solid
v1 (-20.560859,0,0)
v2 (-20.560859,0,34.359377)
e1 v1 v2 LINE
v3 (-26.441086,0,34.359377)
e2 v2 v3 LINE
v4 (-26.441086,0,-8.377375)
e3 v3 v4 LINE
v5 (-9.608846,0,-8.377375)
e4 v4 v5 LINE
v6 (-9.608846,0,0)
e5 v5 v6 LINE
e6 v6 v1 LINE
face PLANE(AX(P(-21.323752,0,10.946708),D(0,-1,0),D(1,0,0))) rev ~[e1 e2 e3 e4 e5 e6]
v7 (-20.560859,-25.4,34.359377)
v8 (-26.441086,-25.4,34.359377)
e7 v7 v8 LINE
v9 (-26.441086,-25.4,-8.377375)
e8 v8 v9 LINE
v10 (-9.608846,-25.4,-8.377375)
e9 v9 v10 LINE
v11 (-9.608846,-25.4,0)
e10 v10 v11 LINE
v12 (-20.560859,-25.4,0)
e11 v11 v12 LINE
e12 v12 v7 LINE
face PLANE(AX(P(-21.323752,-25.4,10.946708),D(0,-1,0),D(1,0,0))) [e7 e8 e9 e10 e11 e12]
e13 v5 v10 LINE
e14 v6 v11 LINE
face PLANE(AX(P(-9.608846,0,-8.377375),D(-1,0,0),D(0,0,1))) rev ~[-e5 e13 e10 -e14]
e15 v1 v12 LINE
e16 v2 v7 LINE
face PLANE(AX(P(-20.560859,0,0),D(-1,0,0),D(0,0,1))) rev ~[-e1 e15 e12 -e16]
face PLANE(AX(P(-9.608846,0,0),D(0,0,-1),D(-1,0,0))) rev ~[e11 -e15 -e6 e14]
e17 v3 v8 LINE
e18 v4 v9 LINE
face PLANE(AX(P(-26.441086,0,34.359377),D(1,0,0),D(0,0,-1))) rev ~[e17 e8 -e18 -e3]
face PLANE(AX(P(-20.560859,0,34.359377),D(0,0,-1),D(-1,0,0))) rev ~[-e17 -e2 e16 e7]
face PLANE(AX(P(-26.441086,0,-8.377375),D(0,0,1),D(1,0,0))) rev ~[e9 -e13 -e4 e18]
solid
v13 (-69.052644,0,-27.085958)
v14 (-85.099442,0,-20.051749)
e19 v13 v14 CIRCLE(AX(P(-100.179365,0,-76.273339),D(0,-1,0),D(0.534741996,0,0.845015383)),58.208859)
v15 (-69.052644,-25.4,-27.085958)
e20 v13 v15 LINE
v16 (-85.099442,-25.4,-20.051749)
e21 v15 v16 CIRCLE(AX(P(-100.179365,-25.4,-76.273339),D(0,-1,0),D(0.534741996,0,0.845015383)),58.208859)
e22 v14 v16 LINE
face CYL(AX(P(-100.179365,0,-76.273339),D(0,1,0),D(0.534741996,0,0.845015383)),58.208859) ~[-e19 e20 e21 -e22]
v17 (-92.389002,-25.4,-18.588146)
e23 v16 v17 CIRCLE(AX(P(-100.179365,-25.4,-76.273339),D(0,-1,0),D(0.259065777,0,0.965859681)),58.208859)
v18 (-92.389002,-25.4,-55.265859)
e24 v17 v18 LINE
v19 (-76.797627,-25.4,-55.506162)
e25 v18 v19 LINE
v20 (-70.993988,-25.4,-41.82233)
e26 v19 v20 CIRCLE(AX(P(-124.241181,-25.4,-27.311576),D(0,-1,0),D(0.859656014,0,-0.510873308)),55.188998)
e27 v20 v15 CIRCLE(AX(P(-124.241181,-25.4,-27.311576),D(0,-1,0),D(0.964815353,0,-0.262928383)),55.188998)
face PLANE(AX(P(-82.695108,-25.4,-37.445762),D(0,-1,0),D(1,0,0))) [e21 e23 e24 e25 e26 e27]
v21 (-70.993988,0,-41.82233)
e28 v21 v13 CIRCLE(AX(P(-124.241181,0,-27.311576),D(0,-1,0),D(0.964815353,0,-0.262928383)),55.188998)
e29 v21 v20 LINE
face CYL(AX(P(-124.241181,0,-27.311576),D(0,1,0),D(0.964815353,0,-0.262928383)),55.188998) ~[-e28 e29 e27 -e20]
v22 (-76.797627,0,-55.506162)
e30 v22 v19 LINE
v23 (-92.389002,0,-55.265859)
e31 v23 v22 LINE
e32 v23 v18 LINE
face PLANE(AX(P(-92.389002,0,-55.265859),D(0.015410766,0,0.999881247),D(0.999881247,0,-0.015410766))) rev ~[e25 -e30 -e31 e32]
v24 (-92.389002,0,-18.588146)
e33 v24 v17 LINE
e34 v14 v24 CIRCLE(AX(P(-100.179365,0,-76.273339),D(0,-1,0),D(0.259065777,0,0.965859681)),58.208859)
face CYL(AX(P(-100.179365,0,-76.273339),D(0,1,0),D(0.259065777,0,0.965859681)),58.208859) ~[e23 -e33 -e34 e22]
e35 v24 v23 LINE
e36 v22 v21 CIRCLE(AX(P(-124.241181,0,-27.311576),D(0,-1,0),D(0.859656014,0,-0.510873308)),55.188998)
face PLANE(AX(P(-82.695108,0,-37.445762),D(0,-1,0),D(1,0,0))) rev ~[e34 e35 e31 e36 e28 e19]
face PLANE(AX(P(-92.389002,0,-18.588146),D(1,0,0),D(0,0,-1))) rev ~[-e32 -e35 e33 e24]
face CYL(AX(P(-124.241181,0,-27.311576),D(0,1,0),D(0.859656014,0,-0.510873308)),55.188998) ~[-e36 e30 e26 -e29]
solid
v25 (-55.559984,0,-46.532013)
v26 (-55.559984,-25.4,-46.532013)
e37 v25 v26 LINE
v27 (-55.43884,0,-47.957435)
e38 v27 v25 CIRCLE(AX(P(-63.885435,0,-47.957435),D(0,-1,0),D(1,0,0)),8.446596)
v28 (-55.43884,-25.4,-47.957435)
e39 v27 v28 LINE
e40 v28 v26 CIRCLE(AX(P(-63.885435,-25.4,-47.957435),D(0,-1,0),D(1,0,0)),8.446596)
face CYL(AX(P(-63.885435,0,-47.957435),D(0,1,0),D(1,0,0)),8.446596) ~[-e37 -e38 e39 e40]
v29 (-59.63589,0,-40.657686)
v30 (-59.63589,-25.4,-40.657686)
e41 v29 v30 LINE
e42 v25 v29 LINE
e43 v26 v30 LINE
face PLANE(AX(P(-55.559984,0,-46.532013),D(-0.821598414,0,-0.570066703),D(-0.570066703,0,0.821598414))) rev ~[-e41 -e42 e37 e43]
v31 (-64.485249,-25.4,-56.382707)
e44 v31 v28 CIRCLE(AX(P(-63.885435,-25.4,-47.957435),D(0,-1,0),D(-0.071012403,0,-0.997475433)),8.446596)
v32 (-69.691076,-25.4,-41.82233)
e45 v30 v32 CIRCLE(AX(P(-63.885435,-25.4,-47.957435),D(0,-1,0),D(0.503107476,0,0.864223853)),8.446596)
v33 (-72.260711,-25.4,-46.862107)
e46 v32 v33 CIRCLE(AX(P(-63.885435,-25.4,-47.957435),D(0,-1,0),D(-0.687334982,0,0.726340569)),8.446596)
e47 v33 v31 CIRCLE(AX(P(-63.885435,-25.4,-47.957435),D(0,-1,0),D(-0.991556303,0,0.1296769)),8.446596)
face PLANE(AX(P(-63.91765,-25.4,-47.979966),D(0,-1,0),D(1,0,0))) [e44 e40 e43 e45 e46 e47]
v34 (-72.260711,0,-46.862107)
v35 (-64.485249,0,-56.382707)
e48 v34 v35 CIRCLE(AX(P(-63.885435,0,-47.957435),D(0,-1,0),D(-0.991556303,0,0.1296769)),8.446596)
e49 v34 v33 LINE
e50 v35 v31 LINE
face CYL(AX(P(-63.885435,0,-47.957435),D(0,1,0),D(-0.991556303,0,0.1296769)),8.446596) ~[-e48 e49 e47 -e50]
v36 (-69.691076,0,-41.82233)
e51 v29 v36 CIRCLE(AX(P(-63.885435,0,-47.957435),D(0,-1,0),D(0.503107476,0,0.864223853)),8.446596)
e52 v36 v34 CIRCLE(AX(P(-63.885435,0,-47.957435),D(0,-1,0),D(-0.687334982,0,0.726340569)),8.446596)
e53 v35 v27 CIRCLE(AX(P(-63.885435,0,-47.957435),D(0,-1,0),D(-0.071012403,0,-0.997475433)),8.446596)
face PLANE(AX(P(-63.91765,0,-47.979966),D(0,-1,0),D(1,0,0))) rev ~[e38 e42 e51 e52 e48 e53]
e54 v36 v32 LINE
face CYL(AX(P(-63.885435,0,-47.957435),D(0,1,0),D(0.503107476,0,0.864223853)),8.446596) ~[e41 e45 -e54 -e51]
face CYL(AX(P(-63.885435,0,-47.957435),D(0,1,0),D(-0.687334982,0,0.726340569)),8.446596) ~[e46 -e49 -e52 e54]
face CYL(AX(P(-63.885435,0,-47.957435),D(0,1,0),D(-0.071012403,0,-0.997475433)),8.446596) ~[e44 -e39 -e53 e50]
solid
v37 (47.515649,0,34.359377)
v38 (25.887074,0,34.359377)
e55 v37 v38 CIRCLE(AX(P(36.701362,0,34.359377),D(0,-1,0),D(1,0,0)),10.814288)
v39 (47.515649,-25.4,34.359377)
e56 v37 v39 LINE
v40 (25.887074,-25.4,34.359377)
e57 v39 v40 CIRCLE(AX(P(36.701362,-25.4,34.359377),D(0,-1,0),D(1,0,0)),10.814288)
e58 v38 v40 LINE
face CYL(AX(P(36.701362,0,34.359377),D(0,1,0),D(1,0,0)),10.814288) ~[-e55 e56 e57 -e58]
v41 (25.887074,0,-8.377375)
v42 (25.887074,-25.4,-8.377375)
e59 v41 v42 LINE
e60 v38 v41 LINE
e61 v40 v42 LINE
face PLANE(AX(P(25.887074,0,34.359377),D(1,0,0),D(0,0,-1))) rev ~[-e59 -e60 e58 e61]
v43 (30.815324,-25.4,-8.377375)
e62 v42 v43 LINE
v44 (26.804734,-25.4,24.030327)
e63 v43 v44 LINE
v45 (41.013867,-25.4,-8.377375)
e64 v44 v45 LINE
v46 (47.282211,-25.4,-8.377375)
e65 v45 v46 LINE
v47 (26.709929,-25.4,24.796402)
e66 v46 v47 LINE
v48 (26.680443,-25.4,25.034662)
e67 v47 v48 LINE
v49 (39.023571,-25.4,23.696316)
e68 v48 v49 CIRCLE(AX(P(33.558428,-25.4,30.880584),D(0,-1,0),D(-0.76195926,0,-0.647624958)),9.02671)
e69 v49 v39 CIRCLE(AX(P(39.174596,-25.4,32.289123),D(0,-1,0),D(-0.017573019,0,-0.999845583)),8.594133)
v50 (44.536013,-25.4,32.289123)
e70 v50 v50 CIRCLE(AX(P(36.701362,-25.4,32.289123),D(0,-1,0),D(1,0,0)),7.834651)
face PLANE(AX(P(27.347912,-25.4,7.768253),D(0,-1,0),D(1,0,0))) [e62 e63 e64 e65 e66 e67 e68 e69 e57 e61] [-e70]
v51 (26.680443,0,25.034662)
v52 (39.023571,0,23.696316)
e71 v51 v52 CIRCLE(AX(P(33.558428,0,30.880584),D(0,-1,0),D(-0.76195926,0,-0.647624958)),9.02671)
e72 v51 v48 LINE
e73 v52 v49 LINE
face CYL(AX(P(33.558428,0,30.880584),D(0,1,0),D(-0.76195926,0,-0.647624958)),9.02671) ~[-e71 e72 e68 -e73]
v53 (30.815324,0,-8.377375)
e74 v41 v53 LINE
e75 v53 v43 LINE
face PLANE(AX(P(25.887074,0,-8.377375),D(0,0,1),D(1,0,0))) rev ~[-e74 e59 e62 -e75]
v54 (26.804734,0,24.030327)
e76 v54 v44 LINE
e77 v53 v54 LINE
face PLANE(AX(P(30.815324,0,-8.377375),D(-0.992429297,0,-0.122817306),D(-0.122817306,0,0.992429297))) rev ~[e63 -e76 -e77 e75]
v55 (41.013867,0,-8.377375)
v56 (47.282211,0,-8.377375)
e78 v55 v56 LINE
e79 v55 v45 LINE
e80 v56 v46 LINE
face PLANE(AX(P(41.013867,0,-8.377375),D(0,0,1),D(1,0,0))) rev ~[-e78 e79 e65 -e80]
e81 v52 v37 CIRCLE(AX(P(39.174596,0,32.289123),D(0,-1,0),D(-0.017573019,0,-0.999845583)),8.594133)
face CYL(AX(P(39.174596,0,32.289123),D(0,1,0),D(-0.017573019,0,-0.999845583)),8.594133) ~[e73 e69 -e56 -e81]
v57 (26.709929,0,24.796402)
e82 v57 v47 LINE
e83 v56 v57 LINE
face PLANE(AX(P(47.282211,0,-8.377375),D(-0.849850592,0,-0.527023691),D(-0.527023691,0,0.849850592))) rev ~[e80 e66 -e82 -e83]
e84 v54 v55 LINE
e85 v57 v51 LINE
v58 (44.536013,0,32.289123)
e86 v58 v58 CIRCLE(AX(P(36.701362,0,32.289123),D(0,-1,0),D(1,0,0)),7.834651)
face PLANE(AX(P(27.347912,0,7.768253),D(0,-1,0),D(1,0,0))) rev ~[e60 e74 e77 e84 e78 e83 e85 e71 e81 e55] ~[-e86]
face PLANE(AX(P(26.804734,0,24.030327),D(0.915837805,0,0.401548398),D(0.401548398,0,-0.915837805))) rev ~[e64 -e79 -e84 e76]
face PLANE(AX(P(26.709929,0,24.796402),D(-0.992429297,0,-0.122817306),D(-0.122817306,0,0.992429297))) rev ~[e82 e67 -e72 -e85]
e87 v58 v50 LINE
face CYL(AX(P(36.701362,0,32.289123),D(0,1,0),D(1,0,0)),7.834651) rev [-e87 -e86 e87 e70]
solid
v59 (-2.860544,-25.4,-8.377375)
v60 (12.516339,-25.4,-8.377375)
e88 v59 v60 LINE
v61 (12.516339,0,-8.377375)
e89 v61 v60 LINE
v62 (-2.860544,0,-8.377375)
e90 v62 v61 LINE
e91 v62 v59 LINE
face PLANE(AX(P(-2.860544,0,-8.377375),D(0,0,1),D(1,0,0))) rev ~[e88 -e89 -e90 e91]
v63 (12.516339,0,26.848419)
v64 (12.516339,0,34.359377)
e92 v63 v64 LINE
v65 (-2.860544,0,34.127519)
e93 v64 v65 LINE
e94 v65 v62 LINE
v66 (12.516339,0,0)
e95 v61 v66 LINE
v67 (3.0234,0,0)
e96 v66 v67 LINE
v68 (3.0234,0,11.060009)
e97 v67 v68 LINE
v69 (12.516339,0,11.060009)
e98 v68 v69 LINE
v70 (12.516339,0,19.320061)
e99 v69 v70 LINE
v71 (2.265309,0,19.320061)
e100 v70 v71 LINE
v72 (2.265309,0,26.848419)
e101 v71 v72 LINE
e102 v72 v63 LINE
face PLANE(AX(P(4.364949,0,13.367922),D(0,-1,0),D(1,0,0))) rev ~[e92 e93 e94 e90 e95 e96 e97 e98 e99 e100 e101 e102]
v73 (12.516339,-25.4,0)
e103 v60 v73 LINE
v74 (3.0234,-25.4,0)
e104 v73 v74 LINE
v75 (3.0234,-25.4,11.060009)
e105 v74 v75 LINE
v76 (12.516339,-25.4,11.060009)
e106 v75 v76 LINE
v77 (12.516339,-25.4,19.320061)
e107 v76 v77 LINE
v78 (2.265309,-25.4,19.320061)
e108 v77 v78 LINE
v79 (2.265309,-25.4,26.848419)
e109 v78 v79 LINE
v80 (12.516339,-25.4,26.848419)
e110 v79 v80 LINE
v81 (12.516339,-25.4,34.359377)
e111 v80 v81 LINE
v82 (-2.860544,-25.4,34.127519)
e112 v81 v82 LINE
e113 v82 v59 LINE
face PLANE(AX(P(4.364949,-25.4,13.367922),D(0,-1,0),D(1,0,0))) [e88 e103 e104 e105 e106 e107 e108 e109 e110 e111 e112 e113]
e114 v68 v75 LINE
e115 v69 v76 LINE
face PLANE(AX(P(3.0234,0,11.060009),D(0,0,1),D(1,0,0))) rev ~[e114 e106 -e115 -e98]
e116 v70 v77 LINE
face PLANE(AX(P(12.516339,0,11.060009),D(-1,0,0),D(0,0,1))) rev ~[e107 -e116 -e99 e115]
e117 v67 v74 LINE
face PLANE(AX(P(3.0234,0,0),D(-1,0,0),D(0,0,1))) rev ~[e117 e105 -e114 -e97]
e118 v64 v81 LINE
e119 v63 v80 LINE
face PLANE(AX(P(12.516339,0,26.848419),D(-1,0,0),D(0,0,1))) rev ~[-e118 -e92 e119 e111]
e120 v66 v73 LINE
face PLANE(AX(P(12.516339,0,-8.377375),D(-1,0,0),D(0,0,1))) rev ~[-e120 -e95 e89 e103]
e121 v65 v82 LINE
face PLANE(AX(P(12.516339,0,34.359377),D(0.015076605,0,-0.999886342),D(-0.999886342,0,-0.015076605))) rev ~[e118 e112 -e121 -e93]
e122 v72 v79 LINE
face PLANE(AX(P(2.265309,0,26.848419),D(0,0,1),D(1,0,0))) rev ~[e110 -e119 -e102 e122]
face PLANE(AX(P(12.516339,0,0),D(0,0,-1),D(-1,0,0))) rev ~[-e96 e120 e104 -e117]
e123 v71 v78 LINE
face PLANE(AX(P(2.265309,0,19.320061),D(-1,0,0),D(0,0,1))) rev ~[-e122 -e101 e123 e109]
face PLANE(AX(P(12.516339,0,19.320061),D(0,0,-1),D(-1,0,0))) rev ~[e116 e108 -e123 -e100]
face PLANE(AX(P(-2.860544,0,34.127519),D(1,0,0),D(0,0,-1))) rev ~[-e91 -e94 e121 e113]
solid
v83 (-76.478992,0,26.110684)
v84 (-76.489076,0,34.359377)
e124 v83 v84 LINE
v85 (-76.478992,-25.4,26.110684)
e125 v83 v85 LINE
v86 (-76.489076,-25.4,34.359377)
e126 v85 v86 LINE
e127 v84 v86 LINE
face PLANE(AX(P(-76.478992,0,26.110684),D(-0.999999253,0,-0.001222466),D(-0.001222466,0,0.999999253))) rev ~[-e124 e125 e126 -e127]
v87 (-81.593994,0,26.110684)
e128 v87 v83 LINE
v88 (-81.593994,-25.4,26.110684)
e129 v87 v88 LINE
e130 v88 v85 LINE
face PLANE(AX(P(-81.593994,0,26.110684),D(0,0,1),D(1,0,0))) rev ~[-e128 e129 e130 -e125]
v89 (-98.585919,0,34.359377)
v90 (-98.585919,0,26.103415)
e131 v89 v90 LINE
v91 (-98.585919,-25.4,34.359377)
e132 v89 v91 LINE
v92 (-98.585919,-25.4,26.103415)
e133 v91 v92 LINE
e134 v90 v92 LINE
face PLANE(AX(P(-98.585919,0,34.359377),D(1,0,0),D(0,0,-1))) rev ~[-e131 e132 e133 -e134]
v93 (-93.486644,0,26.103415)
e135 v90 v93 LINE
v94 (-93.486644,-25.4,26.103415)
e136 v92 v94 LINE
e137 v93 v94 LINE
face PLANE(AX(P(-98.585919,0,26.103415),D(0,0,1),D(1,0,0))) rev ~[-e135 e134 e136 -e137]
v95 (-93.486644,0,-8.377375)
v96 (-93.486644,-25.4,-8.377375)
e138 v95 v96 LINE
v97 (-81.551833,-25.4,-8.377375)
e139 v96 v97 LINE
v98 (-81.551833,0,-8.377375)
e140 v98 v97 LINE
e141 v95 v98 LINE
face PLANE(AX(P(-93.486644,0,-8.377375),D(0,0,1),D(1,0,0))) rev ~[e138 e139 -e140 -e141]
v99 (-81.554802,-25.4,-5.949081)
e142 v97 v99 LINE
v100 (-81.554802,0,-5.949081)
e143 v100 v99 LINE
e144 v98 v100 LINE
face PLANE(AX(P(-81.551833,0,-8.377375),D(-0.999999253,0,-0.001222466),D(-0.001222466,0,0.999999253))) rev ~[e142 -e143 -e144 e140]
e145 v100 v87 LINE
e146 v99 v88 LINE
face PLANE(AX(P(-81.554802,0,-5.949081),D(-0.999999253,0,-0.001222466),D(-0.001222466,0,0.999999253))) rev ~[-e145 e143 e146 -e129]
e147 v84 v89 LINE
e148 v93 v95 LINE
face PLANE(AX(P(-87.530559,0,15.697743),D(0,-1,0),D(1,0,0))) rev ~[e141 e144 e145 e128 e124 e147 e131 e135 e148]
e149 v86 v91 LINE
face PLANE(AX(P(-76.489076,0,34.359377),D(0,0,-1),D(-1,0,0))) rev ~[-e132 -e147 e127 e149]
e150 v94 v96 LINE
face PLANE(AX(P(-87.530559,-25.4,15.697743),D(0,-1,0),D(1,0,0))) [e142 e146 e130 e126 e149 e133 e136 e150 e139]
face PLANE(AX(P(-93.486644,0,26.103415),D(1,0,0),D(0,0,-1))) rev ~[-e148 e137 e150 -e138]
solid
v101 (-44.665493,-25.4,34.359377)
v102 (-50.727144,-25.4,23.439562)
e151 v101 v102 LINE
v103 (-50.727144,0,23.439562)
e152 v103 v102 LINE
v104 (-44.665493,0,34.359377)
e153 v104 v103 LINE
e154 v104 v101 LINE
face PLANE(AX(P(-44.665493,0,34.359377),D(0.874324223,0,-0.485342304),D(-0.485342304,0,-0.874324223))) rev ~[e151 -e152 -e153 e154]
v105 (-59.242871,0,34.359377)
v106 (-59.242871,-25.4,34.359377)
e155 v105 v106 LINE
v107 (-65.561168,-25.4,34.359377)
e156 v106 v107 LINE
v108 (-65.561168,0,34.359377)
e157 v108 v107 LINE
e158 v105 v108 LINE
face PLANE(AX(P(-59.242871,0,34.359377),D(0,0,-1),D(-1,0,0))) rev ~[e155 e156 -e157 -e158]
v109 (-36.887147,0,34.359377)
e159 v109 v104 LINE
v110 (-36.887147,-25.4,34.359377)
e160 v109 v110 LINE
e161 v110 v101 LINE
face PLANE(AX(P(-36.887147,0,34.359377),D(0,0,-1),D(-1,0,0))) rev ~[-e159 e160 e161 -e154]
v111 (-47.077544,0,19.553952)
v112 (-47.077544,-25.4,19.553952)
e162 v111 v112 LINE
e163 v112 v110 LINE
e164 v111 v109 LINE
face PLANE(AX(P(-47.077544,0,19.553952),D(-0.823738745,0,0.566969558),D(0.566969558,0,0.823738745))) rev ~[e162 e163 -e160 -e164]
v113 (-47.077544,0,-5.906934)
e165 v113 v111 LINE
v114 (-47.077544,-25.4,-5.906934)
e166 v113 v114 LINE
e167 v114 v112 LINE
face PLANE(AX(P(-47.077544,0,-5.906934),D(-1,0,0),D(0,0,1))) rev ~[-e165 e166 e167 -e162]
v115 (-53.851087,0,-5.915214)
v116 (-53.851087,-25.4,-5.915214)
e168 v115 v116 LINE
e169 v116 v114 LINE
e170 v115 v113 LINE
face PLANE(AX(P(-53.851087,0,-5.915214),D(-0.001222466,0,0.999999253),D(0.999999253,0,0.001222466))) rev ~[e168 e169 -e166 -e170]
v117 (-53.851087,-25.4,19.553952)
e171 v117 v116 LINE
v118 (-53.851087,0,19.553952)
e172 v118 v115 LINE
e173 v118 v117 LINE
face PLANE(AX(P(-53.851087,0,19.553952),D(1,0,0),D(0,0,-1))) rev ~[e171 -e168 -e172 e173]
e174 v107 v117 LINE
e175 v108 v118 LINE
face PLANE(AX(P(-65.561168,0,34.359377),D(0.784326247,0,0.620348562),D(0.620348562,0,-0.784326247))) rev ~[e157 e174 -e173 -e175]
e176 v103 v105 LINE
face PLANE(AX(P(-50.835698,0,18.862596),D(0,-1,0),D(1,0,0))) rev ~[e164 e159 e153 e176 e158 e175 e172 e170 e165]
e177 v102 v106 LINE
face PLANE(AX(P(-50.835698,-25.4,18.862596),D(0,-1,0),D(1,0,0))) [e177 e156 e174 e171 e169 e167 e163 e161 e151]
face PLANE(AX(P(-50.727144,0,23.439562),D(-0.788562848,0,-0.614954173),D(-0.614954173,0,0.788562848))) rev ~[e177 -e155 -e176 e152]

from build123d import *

# Parameters (mm, degrees)
F1_DEPTH = 25.4
F0_R     = 7.8346511006
F2_DEPTH = 25.4


# Not quite as in the source:
# - a feature names something its author has since deleted; it is built from what else it names


with BuildPart() as f1:
    # F0 (on Front) → F1 (new body)
    with BuildSketch(Plane.XZ):
        Polygon((-81.5548015942, -5.9490810307), (-81.5939936003, 26.1106837792), (-76.4789922628, 26.1106837792), (-76.4890760183, 34.3593768775), (-98.5859185457, 34.3593768775), (-98.5859185457, 26.1034145951), (-93.4866443276, 26.1034145951), (-93.4866443276, -8.3773750812), (-85.1137137568, -8.3773750812), (-81.5518330847, -8.3773750812), align=None)
    extrude(amount=F1_DEPTH)


with BuildPart() as f1b:
    # F0 (on Front) → F1, piece 2 (new body)
    with BuildSketch(Plane.XZ):
        Polygon((-53.8510866463, 19.5539519191), (-53.8510866463, -5.915214152), (-47.0775440335, -5.9069337194), (-47.0775440335, 19.5539519191), (-36.8871465325, 34.3593768775), (-44.6654930711, 34.3593768775), (-50.7271438837, 23.4395619482), (-59.2428706586, 34.3593768775), (-65.5611678958, 34.3593768775), align=None)
    extrude(amount=F1_DEPTH)


with BuildPart() as f1c:
    # F0 (on Front) → F1, piece 3 (new body)
    with BuildSketch(Plane.XZ):
        Polygon((-26.4410860837, 34.3593768775), (-26.4410860837, -5.8817063295), (-9.6088461578, -5.8611294708), (-9.6088461578, 0), (-20.5608587712, 0), (-20.5608587712, 34.3593768775), align=None)
        Polygon((-9.6088461578, -5.8611294708), (-26.4410860837, -5.8817063295), (-26.4410860837, -8.3773750812), (-9.6088461578, -8.3773750812), align=None)
    extrude(amount=F1_DEPTH)


with BuildPart() as f1d:
    # F0 (on Front) → F1, piece 4 (new body)
    with BuildSketch(Plane.XZ):
        Polygon((-2.8605444822, 34.1275193292), (-2.8605444822, -5.8528798943), (-2.8605444822, -8.3773750812), (12.5163393095, -8.3773750812), (12.5163393095, 0), (3.0234002043, 0), (3.0234002043, 11.0600087792), (12.5163393095, 11.0600087792), (12.5163393095, 19.3200614303), (2.2653094493, 19.3200614303), (2.2653094493, 26.8484186381), (12.5163393095, 26.8484186381), (12.5163393095, 34.3593768775), align=None)
    extrude(amount=F1_DEPTH)


with BuildPart() as f1e:
    # F0 (on Front) → F1, piece 5 (new body)
    with BuildSketch(Plane.XZ):
        Polygon((25.887073949, -5.817736878), (25.887073949, -8.3773750812), (30.8153238147, -8.3773750812), (26.804734222, 24.0303265492), (25.887073949, 26.1232946068), align=None)
        Polygon((41.013866663, -8.3773750812), (47.2822114825, -8.3773750812), (26.7099292009, 24.7964016527), (26.804734222, 24.0303265492), align=None)
        with BuildLine():
            Line((25.887073949, 31.4455106854), (25.887073949, 26.1232946068))
            ThreePointArc((25.887073949, 26.1232946068), (26.2634233094, 25.5641583421), (26.6804434798, 25.0346619955))
            Line((26.6804434798, 25.0346619955), (25.887073949, 31.4455106854))
        make_face()
        with BuildLine():
            Line((25.887073949, 31.4455106854), (26.6804434798, 25.0346619955))
            ThreePointArc((26.6804434798, 25.0346619955), (32.5853799721, 21.9064737064), (39.0235707164, 23.6963164061))
            ThreePointArc((39.0235707164, 23.6963164061), (45.8972704971, 26.9351735913), (47.5156493485, 34.3593768775))
            ThreePointArc((47.5156493485, 34.3593768775), (36.7013616487, 45.1736645773), (25.887073949, 34.3593768775))
            Line((25.887073949, 34.3593768775), (25.887073949, 31.4455106854))
        make_face()
        with Locations((36.7013616487, 32.2891227819)):
            Circle(F0_R, mode=Mode.SUBTRACT)
        with BuildLine():
            Line((25.887073949, 26.1232946068), (26.7099292009, 24.7964016527))
            Line((26.7099292009, 24.7964016527), (26.6804434798, 25.0346619955))
            ThreePointArc((26.6804434798, 25.0346619955), (26.2634233094, 25.5641583421), (25.887073949, 26.1232946068))
        make_face()
        Polygon((26.804734222, 24.0303265492), (26.7099292009, 24.7964016527), (25.887073949, 26.1232946068), align=None)
    extrude(amount=F1_DEPTH)


with BuildPart() as f1f:
    # F0 (on Front) → F1, piece 6 (new body)
    with BuildSketch(Plane.XZ):
        with BuildLine():
            ThreePointArc((-69.052644074, -27.0859580487), (-76.8098655757, -22.9616357633), (-85.0994422189, -20.0517493705))
            ThreePointArc((-85.0994422189, -20.0517493705), (-88.7208301281, -19.2034415659), (-92.3890024424, -18.5881461948))
            Line((-92.3890024424, -18.5881461948), (-92.3890024424, -55.2658587694))
            Line((-92.3890024424, -55.2658587694), (-76.7976269126, -55.5061623454))
            ThreePointArc((-76.7976269126, -55.5061623454), (-73.4330277562, -48.8605222286), (-70.9939883224, -41.8223302246))
            ThreePointArc((-70.9939883224, -41.8223302246), (-69.5249399969, -34.5197993576), (-69.052644074, -27.0859580487))
        make_face()
    extrude(amount=F1_DEPTH)


with BuildPart() as f1g:
    # F0 (on Front) → F1, piece 7 (new body)
    with BuildSketch(Plane.XZ):
        with BuildLine():
            Line((-70.9939883224, -44.3777080037), (-69.6910760743, -41.8223302246))
            ThreePointArc((-69.6910760743, -41.8223302246), (-71.4103560372, -44.1206987553), (-72.2607105289, -46.8621069212))
            Line((-72.2607105289, -46.8621069212), (-70.9939883224, -44.3777080037))
        make_face()
    extrude(amount=F1_DEPTH)

    # F0 (on Front) → F2 (join)
    with BuildSketch(Plane.XZ):
        with BuildLine():
            Line((-55.5599836481, -46.5320129656), (-59.6358900865, -40.6576858918))
            ThreePointArc((-59.6358900865, -40.6576858918), (-64.8572673415, -39.5669335136), (-69.6910760743, -41.8223302246))
            Line((-69.6910760743, -41.8223302246), (-70.9939883224, -44.3777080037))
            Line((-70.9939883224, -44.3777080037), (-72.2607105289, -46.8621069212))
            ThreePointArc((-72.2607105289, -46.8621069212), (-70.4274922661, -53.3003248587), (-64.4852485065, -56.3827068131))
            ThreePointArc((-64.4852485065, -56.3827068131), (-58.1287611445, -54.1385093801), (-55.4388398996, -47.9574352503))
            ThreePointArc((-55.4388398996, -47.9574352503), (-55.4691803286, -47.2421547987), (-55.5599836481, -46.5320129656))
        make_face()
    extrude(amount=F2_DEPTH)


solid = Compound([f1.part, f1b.part, f1c.part, f1d.part, f1e.part, f1f.part, f1g.part])
